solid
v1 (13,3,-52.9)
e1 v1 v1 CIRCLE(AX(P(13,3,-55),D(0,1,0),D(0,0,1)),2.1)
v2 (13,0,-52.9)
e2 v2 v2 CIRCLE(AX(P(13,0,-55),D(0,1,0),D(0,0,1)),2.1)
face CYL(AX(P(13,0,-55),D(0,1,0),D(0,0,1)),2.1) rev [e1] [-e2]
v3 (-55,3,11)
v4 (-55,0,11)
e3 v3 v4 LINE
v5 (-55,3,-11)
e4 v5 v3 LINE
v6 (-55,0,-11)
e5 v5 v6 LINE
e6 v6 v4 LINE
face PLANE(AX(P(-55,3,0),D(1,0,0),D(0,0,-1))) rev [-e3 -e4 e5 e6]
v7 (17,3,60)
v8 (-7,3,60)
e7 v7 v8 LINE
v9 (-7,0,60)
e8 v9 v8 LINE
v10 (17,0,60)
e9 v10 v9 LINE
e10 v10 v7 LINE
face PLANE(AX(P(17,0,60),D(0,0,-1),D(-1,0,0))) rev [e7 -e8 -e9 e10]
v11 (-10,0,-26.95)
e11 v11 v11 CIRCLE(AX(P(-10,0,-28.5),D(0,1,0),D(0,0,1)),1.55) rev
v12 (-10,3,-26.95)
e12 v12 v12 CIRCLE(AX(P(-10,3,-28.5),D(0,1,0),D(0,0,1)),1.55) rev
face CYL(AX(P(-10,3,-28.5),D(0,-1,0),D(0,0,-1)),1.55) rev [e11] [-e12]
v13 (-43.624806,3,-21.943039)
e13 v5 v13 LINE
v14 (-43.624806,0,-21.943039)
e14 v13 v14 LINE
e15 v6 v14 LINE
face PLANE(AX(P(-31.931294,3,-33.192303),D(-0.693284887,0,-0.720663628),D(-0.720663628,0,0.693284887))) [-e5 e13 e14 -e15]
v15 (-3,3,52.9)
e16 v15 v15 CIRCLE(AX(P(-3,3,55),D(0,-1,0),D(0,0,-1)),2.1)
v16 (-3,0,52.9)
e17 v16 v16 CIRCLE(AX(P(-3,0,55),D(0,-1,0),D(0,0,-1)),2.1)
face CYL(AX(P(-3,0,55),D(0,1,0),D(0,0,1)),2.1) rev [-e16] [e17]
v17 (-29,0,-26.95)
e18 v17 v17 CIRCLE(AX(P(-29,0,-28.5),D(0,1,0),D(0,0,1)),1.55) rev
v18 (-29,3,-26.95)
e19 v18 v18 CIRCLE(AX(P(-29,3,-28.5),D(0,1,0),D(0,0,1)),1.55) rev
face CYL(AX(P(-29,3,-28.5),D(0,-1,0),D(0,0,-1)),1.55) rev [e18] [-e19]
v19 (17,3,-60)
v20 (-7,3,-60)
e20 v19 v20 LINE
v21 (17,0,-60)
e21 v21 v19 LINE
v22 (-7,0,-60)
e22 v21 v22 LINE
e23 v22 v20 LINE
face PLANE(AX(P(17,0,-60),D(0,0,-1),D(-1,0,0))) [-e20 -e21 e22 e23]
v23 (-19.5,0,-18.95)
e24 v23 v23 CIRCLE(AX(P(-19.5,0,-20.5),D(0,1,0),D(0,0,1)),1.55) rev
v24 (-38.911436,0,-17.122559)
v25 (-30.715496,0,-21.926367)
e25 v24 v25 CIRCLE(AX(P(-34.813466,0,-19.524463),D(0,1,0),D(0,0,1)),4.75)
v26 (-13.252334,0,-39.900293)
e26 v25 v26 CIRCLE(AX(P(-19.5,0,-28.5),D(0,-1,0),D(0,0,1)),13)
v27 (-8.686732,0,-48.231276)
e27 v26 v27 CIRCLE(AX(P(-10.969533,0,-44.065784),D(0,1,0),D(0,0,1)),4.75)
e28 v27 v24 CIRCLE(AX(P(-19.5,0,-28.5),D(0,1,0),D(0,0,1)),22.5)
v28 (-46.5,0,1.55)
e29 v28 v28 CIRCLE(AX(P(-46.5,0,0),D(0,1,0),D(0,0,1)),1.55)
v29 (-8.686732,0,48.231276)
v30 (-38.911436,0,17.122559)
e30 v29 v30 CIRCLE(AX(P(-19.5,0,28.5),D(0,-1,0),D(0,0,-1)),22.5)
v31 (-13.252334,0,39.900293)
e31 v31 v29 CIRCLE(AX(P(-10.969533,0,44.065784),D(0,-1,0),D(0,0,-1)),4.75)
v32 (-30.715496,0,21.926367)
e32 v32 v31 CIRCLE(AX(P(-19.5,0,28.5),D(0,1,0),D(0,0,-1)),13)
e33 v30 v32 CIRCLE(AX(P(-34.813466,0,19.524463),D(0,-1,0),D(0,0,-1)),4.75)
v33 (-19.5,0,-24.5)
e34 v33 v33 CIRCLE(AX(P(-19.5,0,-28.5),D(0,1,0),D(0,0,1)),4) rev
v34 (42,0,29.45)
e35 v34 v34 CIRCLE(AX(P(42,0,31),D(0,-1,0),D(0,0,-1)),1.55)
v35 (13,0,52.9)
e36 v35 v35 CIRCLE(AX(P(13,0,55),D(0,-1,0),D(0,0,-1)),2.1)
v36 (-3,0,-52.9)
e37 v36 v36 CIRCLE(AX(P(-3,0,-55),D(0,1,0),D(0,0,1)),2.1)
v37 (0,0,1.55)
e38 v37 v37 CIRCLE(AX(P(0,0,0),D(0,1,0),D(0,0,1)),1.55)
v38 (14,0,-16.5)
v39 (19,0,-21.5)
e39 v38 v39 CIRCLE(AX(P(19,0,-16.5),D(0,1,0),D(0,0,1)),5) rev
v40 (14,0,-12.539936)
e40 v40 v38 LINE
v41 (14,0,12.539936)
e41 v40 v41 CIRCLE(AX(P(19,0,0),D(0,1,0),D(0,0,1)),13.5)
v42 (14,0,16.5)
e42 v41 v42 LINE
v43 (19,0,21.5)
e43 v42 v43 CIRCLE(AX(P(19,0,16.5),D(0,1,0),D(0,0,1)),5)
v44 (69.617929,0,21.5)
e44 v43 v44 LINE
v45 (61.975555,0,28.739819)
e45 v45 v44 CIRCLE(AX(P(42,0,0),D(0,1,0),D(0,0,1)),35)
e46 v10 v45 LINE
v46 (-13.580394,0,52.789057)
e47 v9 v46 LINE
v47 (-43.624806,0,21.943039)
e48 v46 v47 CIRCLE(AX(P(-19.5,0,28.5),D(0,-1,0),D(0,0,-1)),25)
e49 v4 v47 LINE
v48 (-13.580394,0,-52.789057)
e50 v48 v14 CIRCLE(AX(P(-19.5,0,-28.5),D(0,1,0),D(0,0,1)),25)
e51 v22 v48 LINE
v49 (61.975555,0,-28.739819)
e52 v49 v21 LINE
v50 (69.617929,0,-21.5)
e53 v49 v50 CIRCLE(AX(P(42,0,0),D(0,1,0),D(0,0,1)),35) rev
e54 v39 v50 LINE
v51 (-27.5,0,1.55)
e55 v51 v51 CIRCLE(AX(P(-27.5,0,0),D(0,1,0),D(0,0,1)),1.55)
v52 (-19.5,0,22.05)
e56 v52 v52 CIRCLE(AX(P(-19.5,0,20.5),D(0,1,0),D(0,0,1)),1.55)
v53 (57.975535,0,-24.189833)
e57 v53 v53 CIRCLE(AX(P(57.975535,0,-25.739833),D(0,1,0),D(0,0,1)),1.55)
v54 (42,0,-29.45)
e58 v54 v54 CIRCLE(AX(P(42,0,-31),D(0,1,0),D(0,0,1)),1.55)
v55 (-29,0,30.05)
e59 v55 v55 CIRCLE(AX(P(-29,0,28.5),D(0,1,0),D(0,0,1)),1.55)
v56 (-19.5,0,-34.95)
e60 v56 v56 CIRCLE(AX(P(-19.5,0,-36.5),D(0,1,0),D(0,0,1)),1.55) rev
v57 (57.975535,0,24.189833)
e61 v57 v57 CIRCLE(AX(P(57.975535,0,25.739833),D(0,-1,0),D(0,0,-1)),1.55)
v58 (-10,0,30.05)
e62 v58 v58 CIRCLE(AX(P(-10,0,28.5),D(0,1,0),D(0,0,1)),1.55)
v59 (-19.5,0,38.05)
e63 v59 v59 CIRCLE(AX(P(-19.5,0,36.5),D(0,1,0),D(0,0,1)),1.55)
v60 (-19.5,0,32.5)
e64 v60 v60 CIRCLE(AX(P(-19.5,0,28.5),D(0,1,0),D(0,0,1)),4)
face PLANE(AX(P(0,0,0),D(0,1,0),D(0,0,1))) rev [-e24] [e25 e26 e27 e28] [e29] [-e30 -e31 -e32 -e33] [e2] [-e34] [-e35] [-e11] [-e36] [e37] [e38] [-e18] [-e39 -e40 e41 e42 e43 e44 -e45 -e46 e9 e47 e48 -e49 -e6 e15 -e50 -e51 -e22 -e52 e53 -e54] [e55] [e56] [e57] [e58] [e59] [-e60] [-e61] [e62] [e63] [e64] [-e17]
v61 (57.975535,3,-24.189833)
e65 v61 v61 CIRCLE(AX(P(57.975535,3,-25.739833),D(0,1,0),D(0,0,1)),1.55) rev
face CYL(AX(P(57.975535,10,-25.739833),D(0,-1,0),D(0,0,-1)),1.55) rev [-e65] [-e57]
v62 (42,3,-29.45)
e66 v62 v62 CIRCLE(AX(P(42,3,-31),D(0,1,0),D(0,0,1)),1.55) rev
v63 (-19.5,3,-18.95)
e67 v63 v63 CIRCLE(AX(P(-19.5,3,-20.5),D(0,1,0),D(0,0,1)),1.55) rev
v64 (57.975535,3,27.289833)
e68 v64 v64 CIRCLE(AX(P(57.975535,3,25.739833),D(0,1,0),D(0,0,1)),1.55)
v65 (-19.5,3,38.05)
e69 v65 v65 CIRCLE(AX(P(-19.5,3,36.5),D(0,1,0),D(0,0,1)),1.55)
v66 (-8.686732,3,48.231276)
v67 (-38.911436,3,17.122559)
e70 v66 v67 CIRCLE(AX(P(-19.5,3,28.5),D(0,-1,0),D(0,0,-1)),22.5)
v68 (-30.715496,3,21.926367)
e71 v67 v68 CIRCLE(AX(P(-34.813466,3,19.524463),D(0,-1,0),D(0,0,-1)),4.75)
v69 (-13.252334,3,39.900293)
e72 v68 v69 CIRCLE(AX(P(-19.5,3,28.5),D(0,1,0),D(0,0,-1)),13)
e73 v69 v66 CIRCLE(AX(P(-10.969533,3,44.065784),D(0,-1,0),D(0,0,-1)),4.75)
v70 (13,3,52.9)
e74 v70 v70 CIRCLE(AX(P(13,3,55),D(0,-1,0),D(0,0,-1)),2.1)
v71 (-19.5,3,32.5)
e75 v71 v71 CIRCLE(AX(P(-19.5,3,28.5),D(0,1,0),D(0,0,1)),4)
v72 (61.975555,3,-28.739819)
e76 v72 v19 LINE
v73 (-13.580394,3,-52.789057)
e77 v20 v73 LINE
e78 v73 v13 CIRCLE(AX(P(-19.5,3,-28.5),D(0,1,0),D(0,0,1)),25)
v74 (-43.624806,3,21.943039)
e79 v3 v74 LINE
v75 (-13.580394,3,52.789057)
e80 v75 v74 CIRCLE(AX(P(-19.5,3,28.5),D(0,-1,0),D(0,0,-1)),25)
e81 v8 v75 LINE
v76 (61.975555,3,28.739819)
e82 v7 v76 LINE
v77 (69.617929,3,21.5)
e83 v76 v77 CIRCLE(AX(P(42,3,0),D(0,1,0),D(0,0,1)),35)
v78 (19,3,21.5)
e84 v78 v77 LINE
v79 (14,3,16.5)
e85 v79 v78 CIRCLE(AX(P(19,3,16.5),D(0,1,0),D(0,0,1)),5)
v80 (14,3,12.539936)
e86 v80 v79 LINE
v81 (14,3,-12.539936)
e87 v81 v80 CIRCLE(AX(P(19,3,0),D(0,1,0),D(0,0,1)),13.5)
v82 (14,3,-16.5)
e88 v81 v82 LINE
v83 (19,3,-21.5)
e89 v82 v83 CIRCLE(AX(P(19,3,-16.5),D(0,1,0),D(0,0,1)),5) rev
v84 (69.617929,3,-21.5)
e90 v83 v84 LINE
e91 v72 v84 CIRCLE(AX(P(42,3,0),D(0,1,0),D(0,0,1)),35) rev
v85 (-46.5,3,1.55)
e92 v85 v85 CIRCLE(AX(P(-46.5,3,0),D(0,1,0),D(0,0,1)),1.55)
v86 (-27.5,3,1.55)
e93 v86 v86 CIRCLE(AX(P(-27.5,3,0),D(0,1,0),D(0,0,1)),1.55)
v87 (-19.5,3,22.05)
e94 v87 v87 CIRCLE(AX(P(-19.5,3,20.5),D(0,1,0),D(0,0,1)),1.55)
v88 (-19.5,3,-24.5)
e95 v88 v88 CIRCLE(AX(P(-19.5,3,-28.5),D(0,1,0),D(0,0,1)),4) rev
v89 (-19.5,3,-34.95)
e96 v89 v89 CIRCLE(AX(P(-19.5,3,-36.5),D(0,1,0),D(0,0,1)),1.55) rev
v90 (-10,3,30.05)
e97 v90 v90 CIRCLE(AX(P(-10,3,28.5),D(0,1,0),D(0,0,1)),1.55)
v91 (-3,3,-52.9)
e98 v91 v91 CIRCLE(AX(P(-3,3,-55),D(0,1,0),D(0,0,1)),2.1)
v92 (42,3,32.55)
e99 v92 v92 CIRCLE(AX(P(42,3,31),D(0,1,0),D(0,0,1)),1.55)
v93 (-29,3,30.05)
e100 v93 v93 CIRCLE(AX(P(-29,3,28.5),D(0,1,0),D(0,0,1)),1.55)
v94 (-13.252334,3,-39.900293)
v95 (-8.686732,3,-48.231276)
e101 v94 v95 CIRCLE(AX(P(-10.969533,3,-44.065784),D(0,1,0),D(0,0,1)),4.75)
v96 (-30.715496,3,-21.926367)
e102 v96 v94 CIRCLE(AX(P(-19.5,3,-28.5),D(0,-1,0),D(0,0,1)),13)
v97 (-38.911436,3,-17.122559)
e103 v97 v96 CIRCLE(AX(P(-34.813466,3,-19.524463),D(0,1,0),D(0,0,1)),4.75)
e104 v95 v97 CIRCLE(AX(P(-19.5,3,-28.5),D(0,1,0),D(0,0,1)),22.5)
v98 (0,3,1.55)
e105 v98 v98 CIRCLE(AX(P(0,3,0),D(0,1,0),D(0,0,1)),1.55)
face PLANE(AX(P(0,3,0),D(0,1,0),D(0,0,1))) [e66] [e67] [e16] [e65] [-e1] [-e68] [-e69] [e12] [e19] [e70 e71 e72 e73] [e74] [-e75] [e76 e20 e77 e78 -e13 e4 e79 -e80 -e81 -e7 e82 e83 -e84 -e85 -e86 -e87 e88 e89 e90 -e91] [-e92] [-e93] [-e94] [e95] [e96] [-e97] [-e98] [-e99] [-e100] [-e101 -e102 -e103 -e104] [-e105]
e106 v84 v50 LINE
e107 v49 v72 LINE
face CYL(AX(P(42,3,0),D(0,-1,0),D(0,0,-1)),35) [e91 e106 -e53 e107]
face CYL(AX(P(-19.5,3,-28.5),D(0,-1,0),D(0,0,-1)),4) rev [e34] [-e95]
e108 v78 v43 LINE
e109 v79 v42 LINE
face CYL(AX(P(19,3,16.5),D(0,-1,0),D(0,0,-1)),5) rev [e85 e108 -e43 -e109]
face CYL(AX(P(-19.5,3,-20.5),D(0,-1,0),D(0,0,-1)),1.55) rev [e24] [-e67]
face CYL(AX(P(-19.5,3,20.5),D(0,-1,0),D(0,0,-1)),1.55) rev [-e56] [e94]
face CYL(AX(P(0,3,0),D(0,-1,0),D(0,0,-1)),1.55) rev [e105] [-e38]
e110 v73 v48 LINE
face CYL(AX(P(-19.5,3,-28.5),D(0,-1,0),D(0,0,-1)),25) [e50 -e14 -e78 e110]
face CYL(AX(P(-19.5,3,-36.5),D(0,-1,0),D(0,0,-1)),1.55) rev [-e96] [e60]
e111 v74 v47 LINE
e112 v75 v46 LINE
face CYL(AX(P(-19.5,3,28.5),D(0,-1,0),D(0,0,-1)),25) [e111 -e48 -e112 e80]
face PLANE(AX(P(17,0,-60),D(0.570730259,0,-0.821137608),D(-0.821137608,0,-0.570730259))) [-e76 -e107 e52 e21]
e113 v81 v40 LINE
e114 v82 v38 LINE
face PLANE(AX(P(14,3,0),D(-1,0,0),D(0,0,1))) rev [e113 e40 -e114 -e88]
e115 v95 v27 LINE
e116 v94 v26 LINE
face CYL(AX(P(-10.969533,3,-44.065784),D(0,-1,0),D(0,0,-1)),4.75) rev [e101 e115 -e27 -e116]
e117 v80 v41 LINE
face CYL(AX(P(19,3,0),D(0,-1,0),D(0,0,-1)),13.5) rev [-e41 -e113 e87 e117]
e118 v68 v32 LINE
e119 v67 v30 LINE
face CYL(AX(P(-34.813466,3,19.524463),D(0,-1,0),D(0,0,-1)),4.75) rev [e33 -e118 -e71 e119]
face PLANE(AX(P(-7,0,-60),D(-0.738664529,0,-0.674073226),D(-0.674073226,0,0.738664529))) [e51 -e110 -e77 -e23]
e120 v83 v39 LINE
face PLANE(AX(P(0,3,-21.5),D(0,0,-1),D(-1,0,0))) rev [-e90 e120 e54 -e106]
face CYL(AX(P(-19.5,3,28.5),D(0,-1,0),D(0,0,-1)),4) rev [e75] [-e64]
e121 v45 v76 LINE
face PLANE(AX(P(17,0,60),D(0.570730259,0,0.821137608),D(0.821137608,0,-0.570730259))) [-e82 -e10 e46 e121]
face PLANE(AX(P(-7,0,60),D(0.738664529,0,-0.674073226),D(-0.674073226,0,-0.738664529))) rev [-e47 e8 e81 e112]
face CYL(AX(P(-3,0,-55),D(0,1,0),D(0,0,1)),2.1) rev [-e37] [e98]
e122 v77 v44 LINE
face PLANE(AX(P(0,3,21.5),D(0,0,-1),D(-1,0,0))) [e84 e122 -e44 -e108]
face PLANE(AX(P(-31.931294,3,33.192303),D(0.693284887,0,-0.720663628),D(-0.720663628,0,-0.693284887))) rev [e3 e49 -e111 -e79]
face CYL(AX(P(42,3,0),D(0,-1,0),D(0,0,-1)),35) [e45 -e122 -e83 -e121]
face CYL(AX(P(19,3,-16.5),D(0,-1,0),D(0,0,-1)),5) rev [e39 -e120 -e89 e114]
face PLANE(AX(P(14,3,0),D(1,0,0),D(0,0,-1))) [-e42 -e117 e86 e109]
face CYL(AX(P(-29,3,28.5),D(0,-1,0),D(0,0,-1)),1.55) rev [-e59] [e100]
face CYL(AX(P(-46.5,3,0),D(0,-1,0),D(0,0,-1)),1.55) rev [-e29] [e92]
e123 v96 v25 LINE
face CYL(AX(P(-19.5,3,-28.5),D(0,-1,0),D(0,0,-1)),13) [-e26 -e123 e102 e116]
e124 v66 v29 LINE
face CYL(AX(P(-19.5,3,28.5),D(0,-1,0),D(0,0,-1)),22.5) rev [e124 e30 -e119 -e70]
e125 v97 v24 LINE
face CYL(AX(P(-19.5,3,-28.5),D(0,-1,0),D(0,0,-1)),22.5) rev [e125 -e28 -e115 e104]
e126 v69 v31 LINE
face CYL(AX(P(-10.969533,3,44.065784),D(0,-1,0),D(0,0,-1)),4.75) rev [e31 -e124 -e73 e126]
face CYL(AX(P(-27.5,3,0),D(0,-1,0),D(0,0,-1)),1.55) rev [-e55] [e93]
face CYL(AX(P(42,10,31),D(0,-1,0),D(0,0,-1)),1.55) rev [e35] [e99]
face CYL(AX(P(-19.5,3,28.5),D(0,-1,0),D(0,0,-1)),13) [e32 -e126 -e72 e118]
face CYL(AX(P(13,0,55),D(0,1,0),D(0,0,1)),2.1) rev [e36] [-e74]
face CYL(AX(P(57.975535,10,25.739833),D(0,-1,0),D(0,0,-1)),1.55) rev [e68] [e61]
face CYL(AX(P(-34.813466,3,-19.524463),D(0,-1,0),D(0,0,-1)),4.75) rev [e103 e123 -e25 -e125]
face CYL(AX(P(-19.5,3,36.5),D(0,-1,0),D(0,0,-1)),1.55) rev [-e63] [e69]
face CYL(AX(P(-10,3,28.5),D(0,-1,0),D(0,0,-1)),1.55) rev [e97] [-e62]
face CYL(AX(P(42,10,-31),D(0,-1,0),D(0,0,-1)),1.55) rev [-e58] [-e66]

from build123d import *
from build123d.topology import SkipClean

# Parameters (mm, degrees)
SKETCH_1_R          = 1.55
SKETCH_1_R_2        = 4
EXTRUDE_1_DEPTH     = 3
EXTRUDE_START       = -3
SKETCH_2_R          = 2.1
EXTRUDE_3_DEPTH     = 3
FILLET_1_R          = 4
FILLET_2_R          = 314
FILLET_3_R          = 314
FILLET_4_R          = 4
CUT_EXTRUDE_2_DEPTH = 3
EXTRUDE_4_DEPTH     = 3
EXTRUDE_5_DEPTH     = 3
SKETCH_6_R          = 1.55
CUT_EXTRUDE_3_DEPTH = 10


with BuildPart() as part:
    # 草图1 → 凸台-拉伸1 (new body)
    with BuildSketch(Plane(origin=(0, 0, 0), x_dir=(1, 0, 0), z_dir=(0, 1, 0))):
        with BuildLine():
            Line((-27.819418646, 37.14796354), (-55, 11))
            Line((-55, 11), (-55, -11))
            Line((-55, -11), (-27.819418646, -37.14796354))
            ThreePointArc((-27.819418646, -37.14796354), (-23.984664844, -39.630488814), (-19.5, -40.5))
            Line((-19.5, -40.5), (-17.421399483, -40.31860482))
            Line((-17.421399483, -40.31860482), (45.042813224, -34.867481809))
            ThreePointArc((45.042813224, -34.867481809), (58.724014778, -30.74585061), (69.617928959, -21.5))
            Line((69.617928959, -21.5), (19, -21.5))
            ThreePointArc((19, -21.5), (15.464466094, -20.035533906), (14, -16.5))
            Line((14, -16.5), (14, -12.539936204))
            ThreePointArc((14, -12.539936204), (5.5, 0), (14, 12.539936204))
            Line((14, 12.539936204), (14, 16.5))
            ThreePointArc((14, 16.5), (15.464466094, 20.035533906), (19, 21.5))
            Line((19, 21.5), (69.617928959, 21.5))
            ThreePointArc((69.617928959, 21.5), (58.724014778, 30.74585061), (45.042813224, 34.867481809))
            Line((45.042813224, 34.867481809), (-17.421399483, 40.31860482))
            Line((-17.421399483, 40.31860482), (-19.5, 40.5))
            ThreePointArc((-19.5, 40.5), (-23.984664844, 39.630488814), (-27.819418646, 37.14796354))
        make_face()
        with Locations(Location((-29, -28.5, 0), (0, 0, 270))):
            Circle(SKETCH_1_R, mode=Mode.SUBTRACT)
        with Locations(Location((-19.5, -36.5, 0), (0, 0, 270))):
            Circle(SKETCH_1_R, mode=Mode.SUBTRACT)
        with Locations(Location((-19.5, -28.5, 0), (0, 0, 270))):
            Circle(SKETCH_1_R_2, mode=Mode.SUBTRACT)
        with Locations(Location((-10, -28.5, 0), (0, 0, 270))):
            Circle(SKETCH_1_R, mode=Mode.SUBTRACT)
        with Locations(Location((-19.5, -20.5, 0), (0, 0, 270))):
            Circle(SKETCH_1_R, mode=Mode.SUBTRACT)
        with Locations(Location((-46.5, 0, 0), (0, 0, 270))):
            Circle(SKETCH_1_R, mode=Mode.SUBTRACT)
        with Locations(Location((-27.5, 0, 0), (0, 0, 270))):
            Circle(SKETCH_1_R, mode=Mode.SUBTRACT)
        with Locations(Location((0, 0, 0), (0, 0, 270))):
            Circle(SKETCH_1_R, mode=Mode.SUBTRACT)
        with Locations(Location((-29, 28.5, 0), (0, 0, 270))):
            Circle(SKETCH_1_R, mode=Mode.SUBTRACT)
        with Locations(Location((-19.5, 20.5, 0), (0, 0, 270))):
            Circle(SKETCH_1_R, mode=Mode.SUBTRACT)
        with Locations(Location((-19.5, 28.5, 0), (0, 0, 270))):
            Circle(SKETCH_1_R_2, mode=Mode.SUBTRACT)
        with Locations(Location((-10, 28.5, 0), (0, 0, 270))):
            Circle(SKETCH_1_R, mode=Mode.SUBTRACT)
        with Locations(Location((-19.5, 36.5, 0), (0, 0, 270))):
            Circle(SKETCH_1_R, mode=Mode.SUBTRACT)
    extrude(amount=EXTRUDE_1_DEPTH)

    # 草图2 → 凸台-拉伸3 (add)
    with BuildSketch(Plane(origin=(0, 3, 0), x_dir=(1, 0, 0), z_dir=(0, 1, 0)).offset(EXTRUDE_START)):
        with BuildLine():
            Line((-7, 60), (-28.363974347, 36.588878709))
            ThreePointArc((-28.363974347, 36.588878709), (-26.665503977, 38.125775437), (-24.705947863, 39.311942788))
            Line((-24.705947863, 39.311942788), (-19.656872495, 39.177623495))
            Line((-19.656872495, 39.177623495), (-17.421399483, 40.31860482))
            Line((-17.421399483, 40.31860482), (17, 37.314720281))
            Line((17, 37.314720281), (17, 50))
            Line((17, 50), (17, 60))
            Line((17, 60), (-7, 60))
        make_face()
        with Locations(Location((13, 55, 0), (0, 0, 270))):
            Circle(SKETCH_2_R, mode=Mode.SUBTRACT)
        with Locations(Location((-3, 55, 0), (0, 0, 270))):
            Circle(SKETCH_2_R, mode=Mode.SUBTRACT)
    extrude_3 = extrude(amount=EXTRUDE_3_DEPTH)

    # 圆角1
    fillet_1_edges = [part.edges().sort_by_distance(p)[0] for p in [
        (17, 1.5, -37.314720281),
    ]]
    fillet(fillet_1_edges, radius=FILLET_1_R)

    # 圆角2
    # the kernel refuses this fillet: 314 mm, written as the material it adds along each edge
    with BuildSketch(Plane(origin=(-28.100791786, 0, -36.877280051), x_dir=(0.6740732257670936, 0, -0.7386645289330906), z_dir=(0, 1, 0))) as fillet_2_piece_1:
        with BuildLine():
            CenterArc((FILLET_2_R * 0.032536346624, FILLET_2_R), FILLET_2_R, 266.272924122, 3.727075878)
            Line((-FILLET_2_R * 0.0324675326171, FILLET_2_R * 0.0021149887469), (0, 0))
            Line((0, 0), (FILLET_2_R * 0.032536346624, 0))
        make_face()
    extrude(amount=3)

    # 镜向2: 凸台-拉伸3 across plane
    add(extrude_3.mirror(Plane.XY))

    # 圆角3
    # the kernel refuses this fillet: 314 mm, written as the material it adds along each edge
    with BuildSketch(Plane(origin=(-28.100791786, 0, 36.877280051), x_dir=(-0.7206636283184775, 0, -0.6932848871992288), z_dir=(0, 1, 0))) as fillet_3_piece_1:
        with BuildLine():
            CenterArc((FILLET_3_R * 0.0325363466241, FILLET_3_R), FILLET_3_R, 266.272924122, 3.727075878)
            Line((-FILLET_3_R * 0.0324675326171, FILLET_3_R * 0.0021149887469), (0, 0))
            Line((0, 0), (FILLET_3_R * 0.032536346624, 0))
        make_face()
    extrude(amount=3)

    # 圆角4
    fillet_4_edges = [part.edges().sort_by_distance(p)[0] for p in [
        (17, 1.5, 37.314720281),
    ]]
    fillet(fillet_4_edges, radius=FILLET_4_R)

    # 草图3 → 切除-拉伸2 (cut)
    with BuildSketch(Plane.XZ):
        with BuildLine():
            ThreePointArc((-8.686732059, 48.231275591), (-35.637539634, 44.178960889), (-38.911435654, 17.122558906))
            ThreePointArc((-38.911435654, 17.122558906), (-32.411561674, 15.426493388), (-30.715496156, 21.926367368))
            ThreePointArc((-30.715496156, 21.926367368), (-28.823911789, 37.55895518), (-13.252334078, 39.900292563))
            ThreePointArc((-13.252334078, 39.900292563), (-6.804041555, 41.782983067), (-8.686732059, 48.231275591))
        make_face()
    cut_extrude_2 = extrude(amount=-CUT_EXTRUDE_2_DEPTH, mode=Mode.SUBTRACT)

    # 草图4 → 凸台-拉伸4 (add)
    with SkipClean():  # the faces are left unmerged after this step: merging them gives an invalid solid
        with BuildSketch(Plane.XZ):
            with BuildLine():
                Line((-43.624805935, 21.943038922), (-41.535713139, 23.952764967))
                ThreePointArc((-41.535713139, 23.952764967), (-35.617955509, 44.199092655), (-15.534428758, 50.647781937))
                Line((-15.534428758, 50.647781937), (-13.580394358, 52.78905657))
                ThreePointArc((-13.580394358, 52.78905657), (-37.408839455, 45.943436284), (-43.624805935, 21.943038922))
            make_face()
            with BuildLine():
                ThreePointArc((-25.118289886, 40.223259732), (-28.812596517, 37.570586867), (-31.367097826, 33.807729194))
                ThreePointArc((-31.367097826, 33.807729194), (-28.219819959, 36.993214998), (-25.118289886, 40.223259732))
            make_face()
        extrude_4 = extrude(amount=-EXTRUDE_4_DEPTH)

    # 镜向9: 切除-拉伸2, 凸台-拉伸4 across plane
    with SkipClean():  # the faces are left unmerged after this step: merging them gives an invalid solid
        add(cut_extrude_2.mirror(Plane.XY), mode=Mode.SUBTRACT)
        add(extrude_4.mirror(Plane.XY))

    # 草图5 → 凸台-拉伸5 (add)
    with SkipClean():  # the faces are left unmerged after this step: merging them gives an invalid solid
        with BuildSketch(Plane(origin=(0, 3, 0), x_dir=(1, 0, 0), z_dir=(0, 1, 0)).offset(EXTRUDE_START)):
            with BuildLine():
                Line((17, 60), (61.975554983, 28.739819121))
                ThreePointArc((61.975554983, 28.739819121), (53.910011807, 32.911268872), (45.042813224, 34.867481809))
                Line((45.042813224, 34.867481809), (20.652249917, 36.995995963))
                ThreePointArc((20.652249917, 36.995995963), (18.051186651, 38.278167206), (17, 40.980851027))
                Line((17, 40.980851027), (17, 60))
            make_face()
            with BuildLine():
                Line((17, -40.980851027), (17, -60))
                Line((17, -60), (61.975554983, -28.739819121))
                ThreePointArc((61.975554983, -28.739819121), (53.910011807, -32.911268872), (45.042813224, -34.867481809))
                Line((45.042813224, -34.867481809), (20.652249917, -36.995995963))
                ThreePointArc((20.652249917, -36.995995963), (18.051186651, -38.278167206), (17, -40.980851027))
            make_face()
        extrude(amount=EXTRUDE_5_DEPTH)

    # 草图6 → 切除-拉伸3 (cut)
    with SkipClean():  # the faces are left unmerged after this step: merging them gives an invalid solid
        with BuildSketch(Plane.XZ):
            with Locations(Location((42, 31, 0), (0, 0, 270))):
                Circle(SKETCH_6_R)
            with Locations(Location((57.97553464, 25.73983326, 0), (0, 0, 270))):
                Circle(SKETCH_6_R)
        cut_extrude_3 = extrude(amount=-CUT_EXTRUDE_3_DEPTH, mode=Mode.SUBTRACT)

    # 镜向10: 切除-拉伸3 across plane
    with SkipClean():  # the faces are left unmerged after this step: merging them gives an invalid solid
        add(cut_extrude_3.mirror(Plane.XY), mode=Mode.SUBTRACT)


solid = part.part
